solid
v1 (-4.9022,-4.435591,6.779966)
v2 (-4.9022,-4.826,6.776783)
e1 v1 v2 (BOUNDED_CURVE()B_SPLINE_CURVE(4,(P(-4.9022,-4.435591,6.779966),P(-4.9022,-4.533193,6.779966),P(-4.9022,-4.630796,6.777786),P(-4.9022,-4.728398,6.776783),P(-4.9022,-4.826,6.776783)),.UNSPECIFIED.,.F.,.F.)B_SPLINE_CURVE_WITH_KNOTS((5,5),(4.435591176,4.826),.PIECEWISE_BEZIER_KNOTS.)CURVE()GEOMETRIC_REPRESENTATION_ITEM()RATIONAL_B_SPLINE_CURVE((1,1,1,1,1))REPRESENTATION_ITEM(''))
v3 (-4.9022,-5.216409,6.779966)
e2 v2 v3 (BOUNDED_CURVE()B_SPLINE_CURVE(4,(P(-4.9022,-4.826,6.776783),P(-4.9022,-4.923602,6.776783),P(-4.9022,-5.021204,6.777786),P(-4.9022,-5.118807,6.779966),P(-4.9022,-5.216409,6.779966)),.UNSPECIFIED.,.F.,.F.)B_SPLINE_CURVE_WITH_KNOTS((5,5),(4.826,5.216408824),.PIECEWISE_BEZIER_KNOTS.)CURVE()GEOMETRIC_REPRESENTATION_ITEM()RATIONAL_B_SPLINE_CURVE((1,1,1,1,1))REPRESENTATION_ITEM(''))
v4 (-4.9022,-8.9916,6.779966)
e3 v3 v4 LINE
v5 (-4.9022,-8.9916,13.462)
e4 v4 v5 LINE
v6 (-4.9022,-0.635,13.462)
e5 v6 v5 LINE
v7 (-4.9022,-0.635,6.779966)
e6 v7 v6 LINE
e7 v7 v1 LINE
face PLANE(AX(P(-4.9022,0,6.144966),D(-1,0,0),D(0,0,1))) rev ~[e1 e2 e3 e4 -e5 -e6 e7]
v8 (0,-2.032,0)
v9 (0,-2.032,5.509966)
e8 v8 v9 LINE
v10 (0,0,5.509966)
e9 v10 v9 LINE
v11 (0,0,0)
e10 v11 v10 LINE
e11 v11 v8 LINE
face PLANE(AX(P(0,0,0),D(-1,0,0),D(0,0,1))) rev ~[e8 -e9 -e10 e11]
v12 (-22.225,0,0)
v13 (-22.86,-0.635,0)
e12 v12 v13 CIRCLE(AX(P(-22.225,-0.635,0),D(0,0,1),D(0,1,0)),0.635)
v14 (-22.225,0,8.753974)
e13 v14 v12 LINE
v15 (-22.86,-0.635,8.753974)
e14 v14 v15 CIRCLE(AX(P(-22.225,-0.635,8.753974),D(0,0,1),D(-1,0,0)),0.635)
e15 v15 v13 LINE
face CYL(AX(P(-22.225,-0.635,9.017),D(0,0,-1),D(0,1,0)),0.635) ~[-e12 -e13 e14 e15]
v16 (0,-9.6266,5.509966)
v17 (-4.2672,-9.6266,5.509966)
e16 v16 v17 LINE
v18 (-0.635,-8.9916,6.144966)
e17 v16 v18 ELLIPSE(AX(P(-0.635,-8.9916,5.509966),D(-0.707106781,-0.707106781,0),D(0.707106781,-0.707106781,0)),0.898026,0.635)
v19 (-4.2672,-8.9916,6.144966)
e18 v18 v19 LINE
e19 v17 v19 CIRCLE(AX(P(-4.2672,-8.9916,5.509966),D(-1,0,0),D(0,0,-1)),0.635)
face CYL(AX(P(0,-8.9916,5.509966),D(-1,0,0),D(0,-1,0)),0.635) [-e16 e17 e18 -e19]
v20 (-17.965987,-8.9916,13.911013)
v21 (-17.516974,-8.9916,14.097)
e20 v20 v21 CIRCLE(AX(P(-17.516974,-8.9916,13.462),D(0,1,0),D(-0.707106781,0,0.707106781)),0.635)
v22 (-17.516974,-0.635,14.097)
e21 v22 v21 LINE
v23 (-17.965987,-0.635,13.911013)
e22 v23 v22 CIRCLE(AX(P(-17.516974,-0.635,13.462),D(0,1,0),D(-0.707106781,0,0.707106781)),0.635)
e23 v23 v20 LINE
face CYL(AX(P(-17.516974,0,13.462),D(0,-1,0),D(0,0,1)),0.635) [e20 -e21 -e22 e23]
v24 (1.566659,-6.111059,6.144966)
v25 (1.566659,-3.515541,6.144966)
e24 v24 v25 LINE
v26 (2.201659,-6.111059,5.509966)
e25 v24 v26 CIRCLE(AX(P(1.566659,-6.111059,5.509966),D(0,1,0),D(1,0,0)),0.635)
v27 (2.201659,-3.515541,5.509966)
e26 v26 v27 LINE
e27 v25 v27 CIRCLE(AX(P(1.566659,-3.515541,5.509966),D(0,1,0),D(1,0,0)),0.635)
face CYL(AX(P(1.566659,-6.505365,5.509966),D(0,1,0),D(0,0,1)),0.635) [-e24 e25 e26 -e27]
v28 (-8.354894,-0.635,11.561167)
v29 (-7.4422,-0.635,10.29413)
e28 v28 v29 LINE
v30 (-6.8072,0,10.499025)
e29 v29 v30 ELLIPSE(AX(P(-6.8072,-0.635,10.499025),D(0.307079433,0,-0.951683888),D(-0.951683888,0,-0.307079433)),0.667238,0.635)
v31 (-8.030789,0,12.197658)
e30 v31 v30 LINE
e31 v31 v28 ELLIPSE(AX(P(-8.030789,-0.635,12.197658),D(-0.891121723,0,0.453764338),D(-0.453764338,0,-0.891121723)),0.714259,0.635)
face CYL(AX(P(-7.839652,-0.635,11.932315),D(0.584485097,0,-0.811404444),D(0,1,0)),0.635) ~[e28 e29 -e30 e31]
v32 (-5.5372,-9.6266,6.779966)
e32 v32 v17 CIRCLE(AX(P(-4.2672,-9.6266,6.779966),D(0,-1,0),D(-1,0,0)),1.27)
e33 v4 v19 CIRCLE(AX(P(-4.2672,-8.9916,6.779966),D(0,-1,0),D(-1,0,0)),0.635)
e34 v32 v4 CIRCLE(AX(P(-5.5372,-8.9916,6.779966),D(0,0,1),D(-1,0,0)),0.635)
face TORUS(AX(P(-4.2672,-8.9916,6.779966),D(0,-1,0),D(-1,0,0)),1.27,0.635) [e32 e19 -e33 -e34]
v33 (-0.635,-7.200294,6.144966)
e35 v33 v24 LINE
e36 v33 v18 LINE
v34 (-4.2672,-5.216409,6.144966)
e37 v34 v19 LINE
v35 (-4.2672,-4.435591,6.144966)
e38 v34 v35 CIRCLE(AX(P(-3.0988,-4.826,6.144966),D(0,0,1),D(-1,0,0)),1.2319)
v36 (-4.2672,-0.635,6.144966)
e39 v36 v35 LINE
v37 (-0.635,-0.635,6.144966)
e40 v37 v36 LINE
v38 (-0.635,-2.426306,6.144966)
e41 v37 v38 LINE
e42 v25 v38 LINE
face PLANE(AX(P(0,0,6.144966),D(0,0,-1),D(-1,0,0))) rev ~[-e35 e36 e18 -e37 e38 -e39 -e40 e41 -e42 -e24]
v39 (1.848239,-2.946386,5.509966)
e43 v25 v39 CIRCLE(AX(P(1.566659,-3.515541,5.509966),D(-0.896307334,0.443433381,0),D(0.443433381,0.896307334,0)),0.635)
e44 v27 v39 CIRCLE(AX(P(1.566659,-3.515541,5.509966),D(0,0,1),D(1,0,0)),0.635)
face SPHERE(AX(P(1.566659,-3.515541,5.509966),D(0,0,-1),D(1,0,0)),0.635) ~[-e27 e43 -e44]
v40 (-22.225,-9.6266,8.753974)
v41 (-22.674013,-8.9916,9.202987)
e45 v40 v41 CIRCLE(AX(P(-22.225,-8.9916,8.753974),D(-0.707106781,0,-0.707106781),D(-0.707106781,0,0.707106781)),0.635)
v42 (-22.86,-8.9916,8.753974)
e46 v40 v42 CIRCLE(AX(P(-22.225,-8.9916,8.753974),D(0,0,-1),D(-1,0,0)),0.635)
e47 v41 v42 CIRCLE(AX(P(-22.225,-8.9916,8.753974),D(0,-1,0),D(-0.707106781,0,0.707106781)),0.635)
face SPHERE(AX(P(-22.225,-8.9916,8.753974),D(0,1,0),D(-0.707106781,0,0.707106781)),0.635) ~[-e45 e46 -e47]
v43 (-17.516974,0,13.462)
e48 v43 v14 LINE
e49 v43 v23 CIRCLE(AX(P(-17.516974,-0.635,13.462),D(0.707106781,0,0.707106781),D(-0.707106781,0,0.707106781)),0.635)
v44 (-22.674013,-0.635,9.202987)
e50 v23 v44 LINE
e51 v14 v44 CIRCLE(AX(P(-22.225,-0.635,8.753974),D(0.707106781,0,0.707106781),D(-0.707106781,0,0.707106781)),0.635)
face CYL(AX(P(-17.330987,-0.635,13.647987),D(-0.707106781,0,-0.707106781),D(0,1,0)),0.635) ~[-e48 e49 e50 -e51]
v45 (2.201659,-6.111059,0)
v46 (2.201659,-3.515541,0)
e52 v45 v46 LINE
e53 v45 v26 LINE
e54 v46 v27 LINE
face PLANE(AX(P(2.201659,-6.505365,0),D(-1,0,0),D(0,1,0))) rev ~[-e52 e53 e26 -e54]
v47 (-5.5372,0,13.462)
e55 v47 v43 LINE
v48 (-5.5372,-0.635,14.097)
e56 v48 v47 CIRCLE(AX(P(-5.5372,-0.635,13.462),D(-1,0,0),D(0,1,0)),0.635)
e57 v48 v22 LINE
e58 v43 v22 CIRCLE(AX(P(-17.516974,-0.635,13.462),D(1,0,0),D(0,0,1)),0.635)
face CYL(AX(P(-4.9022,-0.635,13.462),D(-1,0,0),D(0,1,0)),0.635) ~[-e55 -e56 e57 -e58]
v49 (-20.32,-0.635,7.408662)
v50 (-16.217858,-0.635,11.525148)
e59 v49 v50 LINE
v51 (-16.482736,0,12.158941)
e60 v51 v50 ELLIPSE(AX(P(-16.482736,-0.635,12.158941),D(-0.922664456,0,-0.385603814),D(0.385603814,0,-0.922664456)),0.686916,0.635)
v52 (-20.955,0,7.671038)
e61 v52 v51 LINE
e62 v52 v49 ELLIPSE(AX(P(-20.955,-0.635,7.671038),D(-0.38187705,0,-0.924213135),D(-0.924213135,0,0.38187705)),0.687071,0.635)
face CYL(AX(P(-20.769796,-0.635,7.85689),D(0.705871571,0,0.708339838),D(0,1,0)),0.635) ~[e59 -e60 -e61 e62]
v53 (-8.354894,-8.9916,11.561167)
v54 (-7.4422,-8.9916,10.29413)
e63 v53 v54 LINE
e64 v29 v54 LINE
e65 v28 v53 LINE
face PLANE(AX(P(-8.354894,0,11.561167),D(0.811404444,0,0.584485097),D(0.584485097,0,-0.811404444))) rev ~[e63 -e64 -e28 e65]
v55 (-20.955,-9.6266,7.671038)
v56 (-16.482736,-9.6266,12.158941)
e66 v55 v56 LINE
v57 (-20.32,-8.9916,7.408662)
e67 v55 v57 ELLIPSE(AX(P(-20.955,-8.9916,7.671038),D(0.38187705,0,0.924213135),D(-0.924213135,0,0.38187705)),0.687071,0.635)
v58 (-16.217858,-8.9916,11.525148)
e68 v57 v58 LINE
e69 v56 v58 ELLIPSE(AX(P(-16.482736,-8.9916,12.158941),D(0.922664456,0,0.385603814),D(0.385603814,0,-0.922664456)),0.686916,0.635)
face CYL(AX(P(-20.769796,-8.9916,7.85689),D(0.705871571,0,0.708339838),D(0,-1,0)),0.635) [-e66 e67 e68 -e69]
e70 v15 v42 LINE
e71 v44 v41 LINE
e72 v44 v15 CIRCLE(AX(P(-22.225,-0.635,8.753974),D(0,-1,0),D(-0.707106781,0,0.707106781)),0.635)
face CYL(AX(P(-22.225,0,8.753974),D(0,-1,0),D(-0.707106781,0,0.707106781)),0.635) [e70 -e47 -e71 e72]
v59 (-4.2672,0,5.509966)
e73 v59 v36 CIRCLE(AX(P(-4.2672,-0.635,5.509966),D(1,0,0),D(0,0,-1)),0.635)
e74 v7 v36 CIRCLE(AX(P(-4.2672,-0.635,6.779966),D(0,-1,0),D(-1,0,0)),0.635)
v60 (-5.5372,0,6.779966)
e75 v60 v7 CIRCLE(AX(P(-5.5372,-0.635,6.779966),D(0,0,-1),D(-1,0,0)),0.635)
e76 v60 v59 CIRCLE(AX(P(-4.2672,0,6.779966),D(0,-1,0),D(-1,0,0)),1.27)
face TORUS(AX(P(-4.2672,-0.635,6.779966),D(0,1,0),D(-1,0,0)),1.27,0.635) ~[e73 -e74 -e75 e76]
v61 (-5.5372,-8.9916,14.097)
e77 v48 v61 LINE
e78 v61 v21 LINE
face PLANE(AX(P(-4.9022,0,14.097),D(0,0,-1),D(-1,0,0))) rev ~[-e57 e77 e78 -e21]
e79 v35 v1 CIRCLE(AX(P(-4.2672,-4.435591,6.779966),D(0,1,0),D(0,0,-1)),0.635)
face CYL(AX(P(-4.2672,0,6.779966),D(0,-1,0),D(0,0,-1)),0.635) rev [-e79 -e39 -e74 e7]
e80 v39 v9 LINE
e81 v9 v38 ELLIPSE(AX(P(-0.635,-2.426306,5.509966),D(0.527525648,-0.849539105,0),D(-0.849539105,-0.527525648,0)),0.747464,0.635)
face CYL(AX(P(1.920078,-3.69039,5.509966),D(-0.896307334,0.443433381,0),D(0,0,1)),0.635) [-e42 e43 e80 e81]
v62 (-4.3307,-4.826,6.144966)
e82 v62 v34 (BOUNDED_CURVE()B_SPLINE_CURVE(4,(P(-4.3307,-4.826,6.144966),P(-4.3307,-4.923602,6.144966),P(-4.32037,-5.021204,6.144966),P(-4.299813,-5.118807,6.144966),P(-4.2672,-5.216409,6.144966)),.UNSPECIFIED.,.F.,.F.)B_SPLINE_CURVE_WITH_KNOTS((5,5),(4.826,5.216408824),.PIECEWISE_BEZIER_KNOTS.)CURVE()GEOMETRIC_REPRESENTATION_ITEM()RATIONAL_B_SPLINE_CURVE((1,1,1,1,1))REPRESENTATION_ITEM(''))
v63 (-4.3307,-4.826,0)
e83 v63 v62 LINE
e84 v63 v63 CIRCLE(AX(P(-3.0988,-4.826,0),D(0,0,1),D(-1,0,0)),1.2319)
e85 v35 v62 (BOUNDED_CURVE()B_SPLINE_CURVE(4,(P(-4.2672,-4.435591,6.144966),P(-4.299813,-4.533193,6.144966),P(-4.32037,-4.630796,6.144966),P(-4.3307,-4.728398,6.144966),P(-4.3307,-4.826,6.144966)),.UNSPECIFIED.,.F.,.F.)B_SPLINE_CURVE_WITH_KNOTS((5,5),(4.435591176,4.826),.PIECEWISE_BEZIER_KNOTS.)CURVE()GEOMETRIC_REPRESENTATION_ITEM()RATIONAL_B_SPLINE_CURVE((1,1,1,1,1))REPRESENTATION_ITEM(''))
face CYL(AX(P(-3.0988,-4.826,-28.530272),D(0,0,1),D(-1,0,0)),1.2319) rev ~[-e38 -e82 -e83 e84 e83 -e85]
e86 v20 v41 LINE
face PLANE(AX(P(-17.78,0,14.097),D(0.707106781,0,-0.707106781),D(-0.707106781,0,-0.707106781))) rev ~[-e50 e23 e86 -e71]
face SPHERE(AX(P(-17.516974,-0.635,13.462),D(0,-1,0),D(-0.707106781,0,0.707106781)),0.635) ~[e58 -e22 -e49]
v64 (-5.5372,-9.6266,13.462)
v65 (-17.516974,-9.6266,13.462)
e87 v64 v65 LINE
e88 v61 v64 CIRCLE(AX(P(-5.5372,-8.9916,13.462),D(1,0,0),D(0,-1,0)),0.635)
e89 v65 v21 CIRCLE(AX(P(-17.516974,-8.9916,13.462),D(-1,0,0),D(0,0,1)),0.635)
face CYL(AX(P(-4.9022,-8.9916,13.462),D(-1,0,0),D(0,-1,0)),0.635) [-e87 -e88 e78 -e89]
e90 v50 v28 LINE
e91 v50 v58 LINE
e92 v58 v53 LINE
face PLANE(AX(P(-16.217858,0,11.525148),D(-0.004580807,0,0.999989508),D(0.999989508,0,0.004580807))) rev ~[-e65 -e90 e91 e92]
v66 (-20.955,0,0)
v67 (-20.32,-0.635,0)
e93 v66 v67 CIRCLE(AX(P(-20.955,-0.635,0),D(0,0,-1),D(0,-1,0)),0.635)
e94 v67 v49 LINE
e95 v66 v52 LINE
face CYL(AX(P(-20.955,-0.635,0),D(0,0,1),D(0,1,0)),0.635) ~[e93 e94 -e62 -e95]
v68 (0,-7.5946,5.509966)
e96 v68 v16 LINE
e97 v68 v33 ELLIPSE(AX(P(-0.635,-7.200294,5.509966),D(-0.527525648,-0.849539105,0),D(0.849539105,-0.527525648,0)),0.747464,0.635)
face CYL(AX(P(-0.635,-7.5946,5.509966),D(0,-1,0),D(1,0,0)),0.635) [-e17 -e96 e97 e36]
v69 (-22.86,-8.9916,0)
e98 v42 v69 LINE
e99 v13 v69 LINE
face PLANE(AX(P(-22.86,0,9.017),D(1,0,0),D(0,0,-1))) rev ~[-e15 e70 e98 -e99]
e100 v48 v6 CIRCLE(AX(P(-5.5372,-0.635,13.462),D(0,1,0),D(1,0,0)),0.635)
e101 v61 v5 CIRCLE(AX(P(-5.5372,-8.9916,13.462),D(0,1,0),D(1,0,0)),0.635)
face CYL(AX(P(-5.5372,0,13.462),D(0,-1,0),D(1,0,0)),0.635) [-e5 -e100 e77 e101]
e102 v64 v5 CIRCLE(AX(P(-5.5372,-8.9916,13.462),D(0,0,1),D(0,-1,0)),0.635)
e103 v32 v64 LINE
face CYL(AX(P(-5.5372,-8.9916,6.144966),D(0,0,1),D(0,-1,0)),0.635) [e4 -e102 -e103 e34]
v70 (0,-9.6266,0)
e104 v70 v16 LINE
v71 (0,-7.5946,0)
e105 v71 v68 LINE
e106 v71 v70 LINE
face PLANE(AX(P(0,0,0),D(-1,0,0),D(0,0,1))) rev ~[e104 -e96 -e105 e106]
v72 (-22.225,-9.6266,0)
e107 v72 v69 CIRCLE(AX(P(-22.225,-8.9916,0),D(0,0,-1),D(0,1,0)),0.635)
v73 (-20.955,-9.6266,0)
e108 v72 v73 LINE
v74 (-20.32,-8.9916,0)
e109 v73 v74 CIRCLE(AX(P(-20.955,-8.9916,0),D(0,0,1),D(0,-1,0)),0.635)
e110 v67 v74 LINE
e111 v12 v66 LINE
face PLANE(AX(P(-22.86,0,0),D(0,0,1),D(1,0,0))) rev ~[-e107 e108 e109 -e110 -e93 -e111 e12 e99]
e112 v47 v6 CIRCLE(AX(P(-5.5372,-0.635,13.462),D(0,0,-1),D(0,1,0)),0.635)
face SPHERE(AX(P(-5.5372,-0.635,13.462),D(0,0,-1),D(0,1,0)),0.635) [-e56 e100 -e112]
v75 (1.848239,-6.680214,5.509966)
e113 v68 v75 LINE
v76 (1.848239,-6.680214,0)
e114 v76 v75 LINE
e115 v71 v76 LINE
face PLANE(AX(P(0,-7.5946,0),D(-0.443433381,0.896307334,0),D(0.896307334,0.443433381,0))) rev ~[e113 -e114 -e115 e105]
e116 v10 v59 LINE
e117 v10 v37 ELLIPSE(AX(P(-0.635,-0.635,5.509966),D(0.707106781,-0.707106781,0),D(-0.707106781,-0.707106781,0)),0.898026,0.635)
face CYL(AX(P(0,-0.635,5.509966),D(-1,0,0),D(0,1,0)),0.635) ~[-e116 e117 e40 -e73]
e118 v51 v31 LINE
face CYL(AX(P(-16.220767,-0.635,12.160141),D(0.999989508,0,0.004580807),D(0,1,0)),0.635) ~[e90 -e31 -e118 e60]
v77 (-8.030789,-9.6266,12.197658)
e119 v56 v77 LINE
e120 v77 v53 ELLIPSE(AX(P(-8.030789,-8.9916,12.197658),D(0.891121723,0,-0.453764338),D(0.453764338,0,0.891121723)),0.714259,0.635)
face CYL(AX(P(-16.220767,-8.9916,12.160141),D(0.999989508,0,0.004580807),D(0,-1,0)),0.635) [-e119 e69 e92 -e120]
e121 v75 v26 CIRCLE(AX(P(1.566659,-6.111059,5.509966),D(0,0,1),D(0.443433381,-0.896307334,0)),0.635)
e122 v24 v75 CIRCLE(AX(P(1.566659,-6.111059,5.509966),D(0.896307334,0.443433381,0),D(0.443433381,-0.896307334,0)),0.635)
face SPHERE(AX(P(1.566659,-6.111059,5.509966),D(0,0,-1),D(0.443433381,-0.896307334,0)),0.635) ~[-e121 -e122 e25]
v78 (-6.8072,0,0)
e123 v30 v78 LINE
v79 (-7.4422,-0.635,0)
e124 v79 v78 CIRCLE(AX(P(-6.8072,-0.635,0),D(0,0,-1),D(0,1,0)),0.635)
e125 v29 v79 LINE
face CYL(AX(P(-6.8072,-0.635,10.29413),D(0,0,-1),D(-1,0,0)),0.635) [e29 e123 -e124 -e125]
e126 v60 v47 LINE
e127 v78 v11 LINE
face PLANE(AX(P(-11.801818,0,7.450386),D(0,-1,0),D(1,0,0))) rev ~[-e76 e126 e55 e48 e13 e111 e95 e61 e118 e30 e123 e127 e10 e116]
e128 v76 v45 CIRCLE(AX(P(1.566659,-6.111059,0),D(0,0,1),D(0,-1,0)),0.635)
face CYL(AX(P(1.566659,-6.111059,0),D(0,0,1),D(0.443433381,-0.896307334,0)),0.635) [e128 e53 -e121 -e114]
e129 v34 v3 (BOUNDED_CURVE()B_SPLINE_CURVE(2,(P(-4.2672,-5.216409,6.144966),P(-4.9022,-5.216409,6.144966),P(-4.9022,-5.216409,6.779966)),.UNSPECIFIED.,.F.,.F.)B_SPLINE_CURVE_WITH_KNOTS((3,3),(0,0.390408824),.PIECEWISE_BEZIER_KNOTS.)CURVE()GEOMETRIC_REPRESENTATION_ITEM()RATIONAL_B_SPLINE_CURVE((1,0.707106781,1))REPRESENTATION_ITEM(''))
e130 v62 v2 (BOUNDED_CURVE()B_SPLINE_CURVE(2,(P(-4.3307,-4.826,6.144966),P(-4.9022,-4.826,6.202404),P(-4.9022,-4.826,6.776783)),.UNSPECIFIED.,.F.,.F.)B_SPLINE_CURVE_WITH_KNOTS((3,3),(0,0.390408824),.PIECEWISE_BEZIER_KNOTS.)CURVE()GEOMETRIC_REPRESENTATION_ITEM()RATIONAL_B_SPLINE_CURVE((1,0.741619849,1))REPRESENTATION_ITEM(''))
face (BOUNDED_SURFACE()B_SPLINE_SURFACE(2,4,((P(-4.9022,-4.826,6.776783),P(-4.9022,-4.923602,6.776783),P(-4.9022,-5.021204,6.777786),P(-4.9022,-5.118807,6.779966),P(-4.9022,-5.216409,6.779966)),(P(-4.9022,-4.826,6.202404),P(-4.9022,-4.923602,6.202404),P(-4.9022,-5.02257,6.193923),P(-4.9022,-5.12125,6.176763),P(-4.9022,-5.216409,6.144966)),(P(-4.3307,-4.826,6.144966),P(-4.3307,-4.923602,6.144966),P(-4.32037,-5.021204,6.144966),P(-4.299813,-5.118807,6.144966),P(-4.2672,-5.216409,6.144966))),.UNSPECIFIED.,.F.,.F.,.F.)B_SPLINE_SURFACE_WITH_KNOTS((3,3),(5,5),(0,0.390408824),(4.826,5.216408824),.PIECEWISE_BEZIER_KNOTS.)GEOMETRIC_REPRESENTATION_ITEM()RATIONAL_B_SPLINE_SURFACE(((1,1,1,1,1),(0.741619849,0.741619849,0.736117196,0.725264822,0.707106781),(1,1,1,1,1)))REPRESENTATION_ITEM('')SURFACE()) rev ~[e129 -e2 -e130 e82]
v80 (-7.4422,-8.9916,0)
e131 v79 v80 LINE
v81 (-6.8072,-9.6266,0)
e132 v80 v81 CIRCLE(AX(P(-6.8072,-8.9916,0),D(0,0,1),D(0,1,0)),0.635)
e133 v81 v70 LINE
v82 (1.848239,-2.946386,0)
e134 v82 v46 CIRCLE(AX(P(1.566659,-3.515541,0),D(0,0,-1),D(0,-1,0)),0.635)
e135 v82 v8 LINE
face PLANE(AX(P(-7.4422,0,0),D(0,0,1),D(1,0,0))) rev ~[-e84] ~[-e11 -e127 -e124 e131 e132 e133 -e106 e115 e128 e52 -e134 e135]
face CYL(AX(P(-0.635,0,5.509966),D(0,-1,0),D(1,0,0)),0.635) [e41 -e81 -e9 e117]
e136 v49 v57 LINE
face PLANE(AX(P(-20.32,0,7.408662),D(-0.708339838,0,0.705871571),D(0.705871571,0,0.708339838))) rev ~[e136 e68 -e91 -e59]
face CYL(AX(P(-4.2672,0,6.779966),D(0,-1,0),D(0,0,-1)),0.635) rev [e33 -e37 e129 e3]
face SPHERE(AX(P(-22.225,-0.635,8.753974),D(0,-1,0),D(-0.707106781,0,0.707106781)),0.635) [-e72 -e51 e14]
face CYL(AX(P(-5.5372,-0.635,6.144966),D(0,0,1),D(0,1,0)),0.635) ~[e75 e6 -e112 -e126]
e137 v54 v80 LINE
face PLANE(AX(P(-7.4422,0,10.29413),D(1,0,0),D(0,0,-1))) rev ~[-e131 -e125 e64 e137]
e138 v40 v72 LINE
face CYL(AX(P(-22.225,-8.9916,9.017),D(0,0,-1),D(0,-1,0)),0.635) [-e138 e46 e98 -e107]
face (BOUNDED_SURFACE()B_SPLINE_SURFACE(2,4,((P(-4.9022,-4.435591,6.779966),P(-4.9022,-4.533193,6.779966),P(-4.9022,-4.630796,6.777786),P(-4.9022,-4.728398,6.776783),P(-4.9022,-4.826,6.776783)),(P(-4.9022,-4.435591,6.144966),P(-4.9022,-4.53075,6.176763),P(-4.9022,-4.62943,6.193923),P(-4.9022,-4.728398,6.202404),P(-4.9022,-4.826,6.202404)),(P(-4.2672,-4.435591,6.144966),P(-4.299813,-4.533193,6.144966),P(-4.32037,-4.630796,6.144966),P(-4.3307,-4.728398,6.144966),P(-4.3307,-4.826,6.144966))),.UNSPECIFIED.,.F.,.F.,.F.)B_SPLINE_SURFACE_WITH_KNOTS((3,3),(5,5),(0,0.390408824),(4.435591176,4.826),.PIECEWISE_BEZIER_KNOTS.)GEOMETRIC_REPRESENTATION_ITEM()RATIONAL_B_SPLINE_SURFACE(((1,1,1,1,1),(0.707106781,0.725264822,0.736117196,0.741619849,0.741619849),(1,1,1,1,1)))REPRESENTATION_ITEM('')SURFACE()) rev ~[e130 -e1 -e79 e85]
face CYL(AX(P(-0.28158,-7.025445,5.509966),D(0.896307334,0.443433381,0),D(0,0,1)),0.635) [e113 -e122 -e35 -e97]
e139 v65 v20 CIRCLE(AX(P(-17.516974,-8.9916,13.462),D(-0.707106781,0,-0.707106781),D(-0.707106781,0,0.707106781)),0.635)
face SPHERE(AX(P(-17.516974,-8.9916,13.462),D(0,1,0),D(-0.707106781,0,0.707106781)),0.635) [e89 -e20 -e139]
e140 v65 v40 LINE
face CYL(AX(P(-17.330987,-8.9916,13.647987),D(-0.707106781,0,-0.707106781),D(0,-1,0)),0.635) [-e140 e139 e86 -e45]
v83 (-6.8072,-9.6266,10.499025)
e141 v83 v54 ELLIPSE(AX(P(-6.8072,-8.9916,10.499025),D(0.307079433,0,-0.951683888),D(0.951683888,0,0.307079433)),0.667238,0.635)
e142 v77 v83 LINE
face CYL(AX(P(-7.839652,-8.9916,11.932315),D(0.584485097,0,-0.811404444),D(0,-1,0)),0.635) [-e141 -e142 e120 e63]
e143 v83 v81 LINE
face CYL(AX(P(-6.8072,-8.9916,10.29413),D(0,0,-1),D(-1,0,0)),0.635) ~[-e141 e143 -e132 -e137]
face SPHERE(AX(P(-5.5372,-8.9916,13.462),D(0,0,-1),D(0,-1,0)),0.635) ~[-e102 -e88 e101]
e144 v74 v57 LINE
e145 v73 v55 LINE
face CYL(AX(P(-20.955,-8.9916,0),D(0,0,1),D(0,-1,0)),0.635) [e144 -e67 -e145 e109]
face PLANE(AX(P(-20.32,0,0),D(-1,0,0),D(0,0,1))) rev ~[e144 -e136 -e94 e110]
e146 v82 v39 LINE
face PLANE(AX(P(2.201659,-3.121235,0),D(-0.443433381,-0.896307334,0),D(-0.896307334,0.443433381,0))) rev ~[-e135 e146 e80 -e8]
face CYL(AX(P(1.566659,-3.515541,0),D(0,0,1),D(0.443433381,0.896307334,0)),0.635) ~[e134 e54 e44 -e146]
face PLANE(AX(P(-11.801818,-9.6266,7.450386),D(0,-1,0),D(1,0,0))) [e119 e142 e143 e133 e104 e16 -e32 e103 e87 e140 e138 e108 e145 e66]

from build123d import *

# Parameters (mm, degrees)
F1_DEPTH = 9.6266
F3_D     = 2.4638
F5_DEPTH = 6.1449664227
F6_R     = 0.635


# Not quite as in the source:
# - a feature names something its author has since deleted; it is built from what else it names


with BuildPart() as f1:
    # F0 (on Front) → F1 (new body)
    with BuildSketch(Plane.XZ):
        Polygon((-7.4422, 0), (0, 0), (0, 6.1449664227), (-4.9022, 6.1449664227), (-4.9022, 14.097), (-17.78, 14.097), (-22.86, 9.017), (-22.86, 0), (-20.32, 0), (-20.32, 7.4086618234), (-16.2178584248, 11.5251476239), (-8.3548940885, 11.5611667216), (-7.4422, 10.294130072), align=None)
    extrude(amount=F1_DEPTH)

    # F3 (through all)
    with Locations(Plane(origin=(0, 0, 0), x_dir=(1, 0, 0), z_dir=(0, 0, -1))):
        with Locations((-3.0988, 4.826)):
            Hole(F3_D / 2)

    # F4 (on Top) → F5 (join, through all)
    with BuildSketch(Plane.XY):
        Polygon((0, -2.032), (0, -7.5946), (2.2016586276, -6.5053654334), (2.2016586276, -3.1212345666), align=None)
    extrude(amount=F5_DEPTH)

    # F6
    f6_edges = [f1.edges().sort_by_distance(p)[0] for p in [
        (-7.4422, 0, 5.147065),
        (-7.898547, 0, 10.927648),
        (-12.286376, 0, 11.543157),
        (-20.32, 0, 3.704331),
        (-20.32, -9.6266, 3.704331),
        (-12.286376, -9.6266, 11.543157),
        (-7.898547, -9.6266, 10.927648),
        (-7.4422, -9.6266, 5.147065),
        (-4.9022, 0, 10.120983),
        (-4.9022, -9.6266, 10.120983),
        (0, -1.016, 6.144966),
        (0, -8.6106, 6.144966),
        (-2.4511, 0, 6.144966),
        (-2.4511, -9.6266, 6.144966),
        (-20.32, -9.6266, 11.557),
        (-22.86, -9.6266, 4.5085),
        (-18.268929, -9.6266, 9.466905),
        (-20.32, 0, 11.557),
        (-22.86, 0, 4.5085),
        (-18.268929, 0, 9.466905),
        (-11.3411, 0, 14.097),
        (-11.3411, -9.6266, 14.097),
        (-17.78, -4.8133, 14.097),
        (-22.86, -4.8133, 9.017),
        (1.100829, -7.049983, 6.144966),
        (2.201659, -4.8133, 6.144966),
        (1.100829, -2.576617, 6.144966),
        (2.201659, -6.505365, 3.072483),
        (2.201659, -3.121235, 3.072483),
        (-4.9022, -4.8133, 6.144966),
        (-4.9022, -4.8133, 14.097),
    ]]
    fillet(f6_edges, radius=F6_R)


solid = f1.part
